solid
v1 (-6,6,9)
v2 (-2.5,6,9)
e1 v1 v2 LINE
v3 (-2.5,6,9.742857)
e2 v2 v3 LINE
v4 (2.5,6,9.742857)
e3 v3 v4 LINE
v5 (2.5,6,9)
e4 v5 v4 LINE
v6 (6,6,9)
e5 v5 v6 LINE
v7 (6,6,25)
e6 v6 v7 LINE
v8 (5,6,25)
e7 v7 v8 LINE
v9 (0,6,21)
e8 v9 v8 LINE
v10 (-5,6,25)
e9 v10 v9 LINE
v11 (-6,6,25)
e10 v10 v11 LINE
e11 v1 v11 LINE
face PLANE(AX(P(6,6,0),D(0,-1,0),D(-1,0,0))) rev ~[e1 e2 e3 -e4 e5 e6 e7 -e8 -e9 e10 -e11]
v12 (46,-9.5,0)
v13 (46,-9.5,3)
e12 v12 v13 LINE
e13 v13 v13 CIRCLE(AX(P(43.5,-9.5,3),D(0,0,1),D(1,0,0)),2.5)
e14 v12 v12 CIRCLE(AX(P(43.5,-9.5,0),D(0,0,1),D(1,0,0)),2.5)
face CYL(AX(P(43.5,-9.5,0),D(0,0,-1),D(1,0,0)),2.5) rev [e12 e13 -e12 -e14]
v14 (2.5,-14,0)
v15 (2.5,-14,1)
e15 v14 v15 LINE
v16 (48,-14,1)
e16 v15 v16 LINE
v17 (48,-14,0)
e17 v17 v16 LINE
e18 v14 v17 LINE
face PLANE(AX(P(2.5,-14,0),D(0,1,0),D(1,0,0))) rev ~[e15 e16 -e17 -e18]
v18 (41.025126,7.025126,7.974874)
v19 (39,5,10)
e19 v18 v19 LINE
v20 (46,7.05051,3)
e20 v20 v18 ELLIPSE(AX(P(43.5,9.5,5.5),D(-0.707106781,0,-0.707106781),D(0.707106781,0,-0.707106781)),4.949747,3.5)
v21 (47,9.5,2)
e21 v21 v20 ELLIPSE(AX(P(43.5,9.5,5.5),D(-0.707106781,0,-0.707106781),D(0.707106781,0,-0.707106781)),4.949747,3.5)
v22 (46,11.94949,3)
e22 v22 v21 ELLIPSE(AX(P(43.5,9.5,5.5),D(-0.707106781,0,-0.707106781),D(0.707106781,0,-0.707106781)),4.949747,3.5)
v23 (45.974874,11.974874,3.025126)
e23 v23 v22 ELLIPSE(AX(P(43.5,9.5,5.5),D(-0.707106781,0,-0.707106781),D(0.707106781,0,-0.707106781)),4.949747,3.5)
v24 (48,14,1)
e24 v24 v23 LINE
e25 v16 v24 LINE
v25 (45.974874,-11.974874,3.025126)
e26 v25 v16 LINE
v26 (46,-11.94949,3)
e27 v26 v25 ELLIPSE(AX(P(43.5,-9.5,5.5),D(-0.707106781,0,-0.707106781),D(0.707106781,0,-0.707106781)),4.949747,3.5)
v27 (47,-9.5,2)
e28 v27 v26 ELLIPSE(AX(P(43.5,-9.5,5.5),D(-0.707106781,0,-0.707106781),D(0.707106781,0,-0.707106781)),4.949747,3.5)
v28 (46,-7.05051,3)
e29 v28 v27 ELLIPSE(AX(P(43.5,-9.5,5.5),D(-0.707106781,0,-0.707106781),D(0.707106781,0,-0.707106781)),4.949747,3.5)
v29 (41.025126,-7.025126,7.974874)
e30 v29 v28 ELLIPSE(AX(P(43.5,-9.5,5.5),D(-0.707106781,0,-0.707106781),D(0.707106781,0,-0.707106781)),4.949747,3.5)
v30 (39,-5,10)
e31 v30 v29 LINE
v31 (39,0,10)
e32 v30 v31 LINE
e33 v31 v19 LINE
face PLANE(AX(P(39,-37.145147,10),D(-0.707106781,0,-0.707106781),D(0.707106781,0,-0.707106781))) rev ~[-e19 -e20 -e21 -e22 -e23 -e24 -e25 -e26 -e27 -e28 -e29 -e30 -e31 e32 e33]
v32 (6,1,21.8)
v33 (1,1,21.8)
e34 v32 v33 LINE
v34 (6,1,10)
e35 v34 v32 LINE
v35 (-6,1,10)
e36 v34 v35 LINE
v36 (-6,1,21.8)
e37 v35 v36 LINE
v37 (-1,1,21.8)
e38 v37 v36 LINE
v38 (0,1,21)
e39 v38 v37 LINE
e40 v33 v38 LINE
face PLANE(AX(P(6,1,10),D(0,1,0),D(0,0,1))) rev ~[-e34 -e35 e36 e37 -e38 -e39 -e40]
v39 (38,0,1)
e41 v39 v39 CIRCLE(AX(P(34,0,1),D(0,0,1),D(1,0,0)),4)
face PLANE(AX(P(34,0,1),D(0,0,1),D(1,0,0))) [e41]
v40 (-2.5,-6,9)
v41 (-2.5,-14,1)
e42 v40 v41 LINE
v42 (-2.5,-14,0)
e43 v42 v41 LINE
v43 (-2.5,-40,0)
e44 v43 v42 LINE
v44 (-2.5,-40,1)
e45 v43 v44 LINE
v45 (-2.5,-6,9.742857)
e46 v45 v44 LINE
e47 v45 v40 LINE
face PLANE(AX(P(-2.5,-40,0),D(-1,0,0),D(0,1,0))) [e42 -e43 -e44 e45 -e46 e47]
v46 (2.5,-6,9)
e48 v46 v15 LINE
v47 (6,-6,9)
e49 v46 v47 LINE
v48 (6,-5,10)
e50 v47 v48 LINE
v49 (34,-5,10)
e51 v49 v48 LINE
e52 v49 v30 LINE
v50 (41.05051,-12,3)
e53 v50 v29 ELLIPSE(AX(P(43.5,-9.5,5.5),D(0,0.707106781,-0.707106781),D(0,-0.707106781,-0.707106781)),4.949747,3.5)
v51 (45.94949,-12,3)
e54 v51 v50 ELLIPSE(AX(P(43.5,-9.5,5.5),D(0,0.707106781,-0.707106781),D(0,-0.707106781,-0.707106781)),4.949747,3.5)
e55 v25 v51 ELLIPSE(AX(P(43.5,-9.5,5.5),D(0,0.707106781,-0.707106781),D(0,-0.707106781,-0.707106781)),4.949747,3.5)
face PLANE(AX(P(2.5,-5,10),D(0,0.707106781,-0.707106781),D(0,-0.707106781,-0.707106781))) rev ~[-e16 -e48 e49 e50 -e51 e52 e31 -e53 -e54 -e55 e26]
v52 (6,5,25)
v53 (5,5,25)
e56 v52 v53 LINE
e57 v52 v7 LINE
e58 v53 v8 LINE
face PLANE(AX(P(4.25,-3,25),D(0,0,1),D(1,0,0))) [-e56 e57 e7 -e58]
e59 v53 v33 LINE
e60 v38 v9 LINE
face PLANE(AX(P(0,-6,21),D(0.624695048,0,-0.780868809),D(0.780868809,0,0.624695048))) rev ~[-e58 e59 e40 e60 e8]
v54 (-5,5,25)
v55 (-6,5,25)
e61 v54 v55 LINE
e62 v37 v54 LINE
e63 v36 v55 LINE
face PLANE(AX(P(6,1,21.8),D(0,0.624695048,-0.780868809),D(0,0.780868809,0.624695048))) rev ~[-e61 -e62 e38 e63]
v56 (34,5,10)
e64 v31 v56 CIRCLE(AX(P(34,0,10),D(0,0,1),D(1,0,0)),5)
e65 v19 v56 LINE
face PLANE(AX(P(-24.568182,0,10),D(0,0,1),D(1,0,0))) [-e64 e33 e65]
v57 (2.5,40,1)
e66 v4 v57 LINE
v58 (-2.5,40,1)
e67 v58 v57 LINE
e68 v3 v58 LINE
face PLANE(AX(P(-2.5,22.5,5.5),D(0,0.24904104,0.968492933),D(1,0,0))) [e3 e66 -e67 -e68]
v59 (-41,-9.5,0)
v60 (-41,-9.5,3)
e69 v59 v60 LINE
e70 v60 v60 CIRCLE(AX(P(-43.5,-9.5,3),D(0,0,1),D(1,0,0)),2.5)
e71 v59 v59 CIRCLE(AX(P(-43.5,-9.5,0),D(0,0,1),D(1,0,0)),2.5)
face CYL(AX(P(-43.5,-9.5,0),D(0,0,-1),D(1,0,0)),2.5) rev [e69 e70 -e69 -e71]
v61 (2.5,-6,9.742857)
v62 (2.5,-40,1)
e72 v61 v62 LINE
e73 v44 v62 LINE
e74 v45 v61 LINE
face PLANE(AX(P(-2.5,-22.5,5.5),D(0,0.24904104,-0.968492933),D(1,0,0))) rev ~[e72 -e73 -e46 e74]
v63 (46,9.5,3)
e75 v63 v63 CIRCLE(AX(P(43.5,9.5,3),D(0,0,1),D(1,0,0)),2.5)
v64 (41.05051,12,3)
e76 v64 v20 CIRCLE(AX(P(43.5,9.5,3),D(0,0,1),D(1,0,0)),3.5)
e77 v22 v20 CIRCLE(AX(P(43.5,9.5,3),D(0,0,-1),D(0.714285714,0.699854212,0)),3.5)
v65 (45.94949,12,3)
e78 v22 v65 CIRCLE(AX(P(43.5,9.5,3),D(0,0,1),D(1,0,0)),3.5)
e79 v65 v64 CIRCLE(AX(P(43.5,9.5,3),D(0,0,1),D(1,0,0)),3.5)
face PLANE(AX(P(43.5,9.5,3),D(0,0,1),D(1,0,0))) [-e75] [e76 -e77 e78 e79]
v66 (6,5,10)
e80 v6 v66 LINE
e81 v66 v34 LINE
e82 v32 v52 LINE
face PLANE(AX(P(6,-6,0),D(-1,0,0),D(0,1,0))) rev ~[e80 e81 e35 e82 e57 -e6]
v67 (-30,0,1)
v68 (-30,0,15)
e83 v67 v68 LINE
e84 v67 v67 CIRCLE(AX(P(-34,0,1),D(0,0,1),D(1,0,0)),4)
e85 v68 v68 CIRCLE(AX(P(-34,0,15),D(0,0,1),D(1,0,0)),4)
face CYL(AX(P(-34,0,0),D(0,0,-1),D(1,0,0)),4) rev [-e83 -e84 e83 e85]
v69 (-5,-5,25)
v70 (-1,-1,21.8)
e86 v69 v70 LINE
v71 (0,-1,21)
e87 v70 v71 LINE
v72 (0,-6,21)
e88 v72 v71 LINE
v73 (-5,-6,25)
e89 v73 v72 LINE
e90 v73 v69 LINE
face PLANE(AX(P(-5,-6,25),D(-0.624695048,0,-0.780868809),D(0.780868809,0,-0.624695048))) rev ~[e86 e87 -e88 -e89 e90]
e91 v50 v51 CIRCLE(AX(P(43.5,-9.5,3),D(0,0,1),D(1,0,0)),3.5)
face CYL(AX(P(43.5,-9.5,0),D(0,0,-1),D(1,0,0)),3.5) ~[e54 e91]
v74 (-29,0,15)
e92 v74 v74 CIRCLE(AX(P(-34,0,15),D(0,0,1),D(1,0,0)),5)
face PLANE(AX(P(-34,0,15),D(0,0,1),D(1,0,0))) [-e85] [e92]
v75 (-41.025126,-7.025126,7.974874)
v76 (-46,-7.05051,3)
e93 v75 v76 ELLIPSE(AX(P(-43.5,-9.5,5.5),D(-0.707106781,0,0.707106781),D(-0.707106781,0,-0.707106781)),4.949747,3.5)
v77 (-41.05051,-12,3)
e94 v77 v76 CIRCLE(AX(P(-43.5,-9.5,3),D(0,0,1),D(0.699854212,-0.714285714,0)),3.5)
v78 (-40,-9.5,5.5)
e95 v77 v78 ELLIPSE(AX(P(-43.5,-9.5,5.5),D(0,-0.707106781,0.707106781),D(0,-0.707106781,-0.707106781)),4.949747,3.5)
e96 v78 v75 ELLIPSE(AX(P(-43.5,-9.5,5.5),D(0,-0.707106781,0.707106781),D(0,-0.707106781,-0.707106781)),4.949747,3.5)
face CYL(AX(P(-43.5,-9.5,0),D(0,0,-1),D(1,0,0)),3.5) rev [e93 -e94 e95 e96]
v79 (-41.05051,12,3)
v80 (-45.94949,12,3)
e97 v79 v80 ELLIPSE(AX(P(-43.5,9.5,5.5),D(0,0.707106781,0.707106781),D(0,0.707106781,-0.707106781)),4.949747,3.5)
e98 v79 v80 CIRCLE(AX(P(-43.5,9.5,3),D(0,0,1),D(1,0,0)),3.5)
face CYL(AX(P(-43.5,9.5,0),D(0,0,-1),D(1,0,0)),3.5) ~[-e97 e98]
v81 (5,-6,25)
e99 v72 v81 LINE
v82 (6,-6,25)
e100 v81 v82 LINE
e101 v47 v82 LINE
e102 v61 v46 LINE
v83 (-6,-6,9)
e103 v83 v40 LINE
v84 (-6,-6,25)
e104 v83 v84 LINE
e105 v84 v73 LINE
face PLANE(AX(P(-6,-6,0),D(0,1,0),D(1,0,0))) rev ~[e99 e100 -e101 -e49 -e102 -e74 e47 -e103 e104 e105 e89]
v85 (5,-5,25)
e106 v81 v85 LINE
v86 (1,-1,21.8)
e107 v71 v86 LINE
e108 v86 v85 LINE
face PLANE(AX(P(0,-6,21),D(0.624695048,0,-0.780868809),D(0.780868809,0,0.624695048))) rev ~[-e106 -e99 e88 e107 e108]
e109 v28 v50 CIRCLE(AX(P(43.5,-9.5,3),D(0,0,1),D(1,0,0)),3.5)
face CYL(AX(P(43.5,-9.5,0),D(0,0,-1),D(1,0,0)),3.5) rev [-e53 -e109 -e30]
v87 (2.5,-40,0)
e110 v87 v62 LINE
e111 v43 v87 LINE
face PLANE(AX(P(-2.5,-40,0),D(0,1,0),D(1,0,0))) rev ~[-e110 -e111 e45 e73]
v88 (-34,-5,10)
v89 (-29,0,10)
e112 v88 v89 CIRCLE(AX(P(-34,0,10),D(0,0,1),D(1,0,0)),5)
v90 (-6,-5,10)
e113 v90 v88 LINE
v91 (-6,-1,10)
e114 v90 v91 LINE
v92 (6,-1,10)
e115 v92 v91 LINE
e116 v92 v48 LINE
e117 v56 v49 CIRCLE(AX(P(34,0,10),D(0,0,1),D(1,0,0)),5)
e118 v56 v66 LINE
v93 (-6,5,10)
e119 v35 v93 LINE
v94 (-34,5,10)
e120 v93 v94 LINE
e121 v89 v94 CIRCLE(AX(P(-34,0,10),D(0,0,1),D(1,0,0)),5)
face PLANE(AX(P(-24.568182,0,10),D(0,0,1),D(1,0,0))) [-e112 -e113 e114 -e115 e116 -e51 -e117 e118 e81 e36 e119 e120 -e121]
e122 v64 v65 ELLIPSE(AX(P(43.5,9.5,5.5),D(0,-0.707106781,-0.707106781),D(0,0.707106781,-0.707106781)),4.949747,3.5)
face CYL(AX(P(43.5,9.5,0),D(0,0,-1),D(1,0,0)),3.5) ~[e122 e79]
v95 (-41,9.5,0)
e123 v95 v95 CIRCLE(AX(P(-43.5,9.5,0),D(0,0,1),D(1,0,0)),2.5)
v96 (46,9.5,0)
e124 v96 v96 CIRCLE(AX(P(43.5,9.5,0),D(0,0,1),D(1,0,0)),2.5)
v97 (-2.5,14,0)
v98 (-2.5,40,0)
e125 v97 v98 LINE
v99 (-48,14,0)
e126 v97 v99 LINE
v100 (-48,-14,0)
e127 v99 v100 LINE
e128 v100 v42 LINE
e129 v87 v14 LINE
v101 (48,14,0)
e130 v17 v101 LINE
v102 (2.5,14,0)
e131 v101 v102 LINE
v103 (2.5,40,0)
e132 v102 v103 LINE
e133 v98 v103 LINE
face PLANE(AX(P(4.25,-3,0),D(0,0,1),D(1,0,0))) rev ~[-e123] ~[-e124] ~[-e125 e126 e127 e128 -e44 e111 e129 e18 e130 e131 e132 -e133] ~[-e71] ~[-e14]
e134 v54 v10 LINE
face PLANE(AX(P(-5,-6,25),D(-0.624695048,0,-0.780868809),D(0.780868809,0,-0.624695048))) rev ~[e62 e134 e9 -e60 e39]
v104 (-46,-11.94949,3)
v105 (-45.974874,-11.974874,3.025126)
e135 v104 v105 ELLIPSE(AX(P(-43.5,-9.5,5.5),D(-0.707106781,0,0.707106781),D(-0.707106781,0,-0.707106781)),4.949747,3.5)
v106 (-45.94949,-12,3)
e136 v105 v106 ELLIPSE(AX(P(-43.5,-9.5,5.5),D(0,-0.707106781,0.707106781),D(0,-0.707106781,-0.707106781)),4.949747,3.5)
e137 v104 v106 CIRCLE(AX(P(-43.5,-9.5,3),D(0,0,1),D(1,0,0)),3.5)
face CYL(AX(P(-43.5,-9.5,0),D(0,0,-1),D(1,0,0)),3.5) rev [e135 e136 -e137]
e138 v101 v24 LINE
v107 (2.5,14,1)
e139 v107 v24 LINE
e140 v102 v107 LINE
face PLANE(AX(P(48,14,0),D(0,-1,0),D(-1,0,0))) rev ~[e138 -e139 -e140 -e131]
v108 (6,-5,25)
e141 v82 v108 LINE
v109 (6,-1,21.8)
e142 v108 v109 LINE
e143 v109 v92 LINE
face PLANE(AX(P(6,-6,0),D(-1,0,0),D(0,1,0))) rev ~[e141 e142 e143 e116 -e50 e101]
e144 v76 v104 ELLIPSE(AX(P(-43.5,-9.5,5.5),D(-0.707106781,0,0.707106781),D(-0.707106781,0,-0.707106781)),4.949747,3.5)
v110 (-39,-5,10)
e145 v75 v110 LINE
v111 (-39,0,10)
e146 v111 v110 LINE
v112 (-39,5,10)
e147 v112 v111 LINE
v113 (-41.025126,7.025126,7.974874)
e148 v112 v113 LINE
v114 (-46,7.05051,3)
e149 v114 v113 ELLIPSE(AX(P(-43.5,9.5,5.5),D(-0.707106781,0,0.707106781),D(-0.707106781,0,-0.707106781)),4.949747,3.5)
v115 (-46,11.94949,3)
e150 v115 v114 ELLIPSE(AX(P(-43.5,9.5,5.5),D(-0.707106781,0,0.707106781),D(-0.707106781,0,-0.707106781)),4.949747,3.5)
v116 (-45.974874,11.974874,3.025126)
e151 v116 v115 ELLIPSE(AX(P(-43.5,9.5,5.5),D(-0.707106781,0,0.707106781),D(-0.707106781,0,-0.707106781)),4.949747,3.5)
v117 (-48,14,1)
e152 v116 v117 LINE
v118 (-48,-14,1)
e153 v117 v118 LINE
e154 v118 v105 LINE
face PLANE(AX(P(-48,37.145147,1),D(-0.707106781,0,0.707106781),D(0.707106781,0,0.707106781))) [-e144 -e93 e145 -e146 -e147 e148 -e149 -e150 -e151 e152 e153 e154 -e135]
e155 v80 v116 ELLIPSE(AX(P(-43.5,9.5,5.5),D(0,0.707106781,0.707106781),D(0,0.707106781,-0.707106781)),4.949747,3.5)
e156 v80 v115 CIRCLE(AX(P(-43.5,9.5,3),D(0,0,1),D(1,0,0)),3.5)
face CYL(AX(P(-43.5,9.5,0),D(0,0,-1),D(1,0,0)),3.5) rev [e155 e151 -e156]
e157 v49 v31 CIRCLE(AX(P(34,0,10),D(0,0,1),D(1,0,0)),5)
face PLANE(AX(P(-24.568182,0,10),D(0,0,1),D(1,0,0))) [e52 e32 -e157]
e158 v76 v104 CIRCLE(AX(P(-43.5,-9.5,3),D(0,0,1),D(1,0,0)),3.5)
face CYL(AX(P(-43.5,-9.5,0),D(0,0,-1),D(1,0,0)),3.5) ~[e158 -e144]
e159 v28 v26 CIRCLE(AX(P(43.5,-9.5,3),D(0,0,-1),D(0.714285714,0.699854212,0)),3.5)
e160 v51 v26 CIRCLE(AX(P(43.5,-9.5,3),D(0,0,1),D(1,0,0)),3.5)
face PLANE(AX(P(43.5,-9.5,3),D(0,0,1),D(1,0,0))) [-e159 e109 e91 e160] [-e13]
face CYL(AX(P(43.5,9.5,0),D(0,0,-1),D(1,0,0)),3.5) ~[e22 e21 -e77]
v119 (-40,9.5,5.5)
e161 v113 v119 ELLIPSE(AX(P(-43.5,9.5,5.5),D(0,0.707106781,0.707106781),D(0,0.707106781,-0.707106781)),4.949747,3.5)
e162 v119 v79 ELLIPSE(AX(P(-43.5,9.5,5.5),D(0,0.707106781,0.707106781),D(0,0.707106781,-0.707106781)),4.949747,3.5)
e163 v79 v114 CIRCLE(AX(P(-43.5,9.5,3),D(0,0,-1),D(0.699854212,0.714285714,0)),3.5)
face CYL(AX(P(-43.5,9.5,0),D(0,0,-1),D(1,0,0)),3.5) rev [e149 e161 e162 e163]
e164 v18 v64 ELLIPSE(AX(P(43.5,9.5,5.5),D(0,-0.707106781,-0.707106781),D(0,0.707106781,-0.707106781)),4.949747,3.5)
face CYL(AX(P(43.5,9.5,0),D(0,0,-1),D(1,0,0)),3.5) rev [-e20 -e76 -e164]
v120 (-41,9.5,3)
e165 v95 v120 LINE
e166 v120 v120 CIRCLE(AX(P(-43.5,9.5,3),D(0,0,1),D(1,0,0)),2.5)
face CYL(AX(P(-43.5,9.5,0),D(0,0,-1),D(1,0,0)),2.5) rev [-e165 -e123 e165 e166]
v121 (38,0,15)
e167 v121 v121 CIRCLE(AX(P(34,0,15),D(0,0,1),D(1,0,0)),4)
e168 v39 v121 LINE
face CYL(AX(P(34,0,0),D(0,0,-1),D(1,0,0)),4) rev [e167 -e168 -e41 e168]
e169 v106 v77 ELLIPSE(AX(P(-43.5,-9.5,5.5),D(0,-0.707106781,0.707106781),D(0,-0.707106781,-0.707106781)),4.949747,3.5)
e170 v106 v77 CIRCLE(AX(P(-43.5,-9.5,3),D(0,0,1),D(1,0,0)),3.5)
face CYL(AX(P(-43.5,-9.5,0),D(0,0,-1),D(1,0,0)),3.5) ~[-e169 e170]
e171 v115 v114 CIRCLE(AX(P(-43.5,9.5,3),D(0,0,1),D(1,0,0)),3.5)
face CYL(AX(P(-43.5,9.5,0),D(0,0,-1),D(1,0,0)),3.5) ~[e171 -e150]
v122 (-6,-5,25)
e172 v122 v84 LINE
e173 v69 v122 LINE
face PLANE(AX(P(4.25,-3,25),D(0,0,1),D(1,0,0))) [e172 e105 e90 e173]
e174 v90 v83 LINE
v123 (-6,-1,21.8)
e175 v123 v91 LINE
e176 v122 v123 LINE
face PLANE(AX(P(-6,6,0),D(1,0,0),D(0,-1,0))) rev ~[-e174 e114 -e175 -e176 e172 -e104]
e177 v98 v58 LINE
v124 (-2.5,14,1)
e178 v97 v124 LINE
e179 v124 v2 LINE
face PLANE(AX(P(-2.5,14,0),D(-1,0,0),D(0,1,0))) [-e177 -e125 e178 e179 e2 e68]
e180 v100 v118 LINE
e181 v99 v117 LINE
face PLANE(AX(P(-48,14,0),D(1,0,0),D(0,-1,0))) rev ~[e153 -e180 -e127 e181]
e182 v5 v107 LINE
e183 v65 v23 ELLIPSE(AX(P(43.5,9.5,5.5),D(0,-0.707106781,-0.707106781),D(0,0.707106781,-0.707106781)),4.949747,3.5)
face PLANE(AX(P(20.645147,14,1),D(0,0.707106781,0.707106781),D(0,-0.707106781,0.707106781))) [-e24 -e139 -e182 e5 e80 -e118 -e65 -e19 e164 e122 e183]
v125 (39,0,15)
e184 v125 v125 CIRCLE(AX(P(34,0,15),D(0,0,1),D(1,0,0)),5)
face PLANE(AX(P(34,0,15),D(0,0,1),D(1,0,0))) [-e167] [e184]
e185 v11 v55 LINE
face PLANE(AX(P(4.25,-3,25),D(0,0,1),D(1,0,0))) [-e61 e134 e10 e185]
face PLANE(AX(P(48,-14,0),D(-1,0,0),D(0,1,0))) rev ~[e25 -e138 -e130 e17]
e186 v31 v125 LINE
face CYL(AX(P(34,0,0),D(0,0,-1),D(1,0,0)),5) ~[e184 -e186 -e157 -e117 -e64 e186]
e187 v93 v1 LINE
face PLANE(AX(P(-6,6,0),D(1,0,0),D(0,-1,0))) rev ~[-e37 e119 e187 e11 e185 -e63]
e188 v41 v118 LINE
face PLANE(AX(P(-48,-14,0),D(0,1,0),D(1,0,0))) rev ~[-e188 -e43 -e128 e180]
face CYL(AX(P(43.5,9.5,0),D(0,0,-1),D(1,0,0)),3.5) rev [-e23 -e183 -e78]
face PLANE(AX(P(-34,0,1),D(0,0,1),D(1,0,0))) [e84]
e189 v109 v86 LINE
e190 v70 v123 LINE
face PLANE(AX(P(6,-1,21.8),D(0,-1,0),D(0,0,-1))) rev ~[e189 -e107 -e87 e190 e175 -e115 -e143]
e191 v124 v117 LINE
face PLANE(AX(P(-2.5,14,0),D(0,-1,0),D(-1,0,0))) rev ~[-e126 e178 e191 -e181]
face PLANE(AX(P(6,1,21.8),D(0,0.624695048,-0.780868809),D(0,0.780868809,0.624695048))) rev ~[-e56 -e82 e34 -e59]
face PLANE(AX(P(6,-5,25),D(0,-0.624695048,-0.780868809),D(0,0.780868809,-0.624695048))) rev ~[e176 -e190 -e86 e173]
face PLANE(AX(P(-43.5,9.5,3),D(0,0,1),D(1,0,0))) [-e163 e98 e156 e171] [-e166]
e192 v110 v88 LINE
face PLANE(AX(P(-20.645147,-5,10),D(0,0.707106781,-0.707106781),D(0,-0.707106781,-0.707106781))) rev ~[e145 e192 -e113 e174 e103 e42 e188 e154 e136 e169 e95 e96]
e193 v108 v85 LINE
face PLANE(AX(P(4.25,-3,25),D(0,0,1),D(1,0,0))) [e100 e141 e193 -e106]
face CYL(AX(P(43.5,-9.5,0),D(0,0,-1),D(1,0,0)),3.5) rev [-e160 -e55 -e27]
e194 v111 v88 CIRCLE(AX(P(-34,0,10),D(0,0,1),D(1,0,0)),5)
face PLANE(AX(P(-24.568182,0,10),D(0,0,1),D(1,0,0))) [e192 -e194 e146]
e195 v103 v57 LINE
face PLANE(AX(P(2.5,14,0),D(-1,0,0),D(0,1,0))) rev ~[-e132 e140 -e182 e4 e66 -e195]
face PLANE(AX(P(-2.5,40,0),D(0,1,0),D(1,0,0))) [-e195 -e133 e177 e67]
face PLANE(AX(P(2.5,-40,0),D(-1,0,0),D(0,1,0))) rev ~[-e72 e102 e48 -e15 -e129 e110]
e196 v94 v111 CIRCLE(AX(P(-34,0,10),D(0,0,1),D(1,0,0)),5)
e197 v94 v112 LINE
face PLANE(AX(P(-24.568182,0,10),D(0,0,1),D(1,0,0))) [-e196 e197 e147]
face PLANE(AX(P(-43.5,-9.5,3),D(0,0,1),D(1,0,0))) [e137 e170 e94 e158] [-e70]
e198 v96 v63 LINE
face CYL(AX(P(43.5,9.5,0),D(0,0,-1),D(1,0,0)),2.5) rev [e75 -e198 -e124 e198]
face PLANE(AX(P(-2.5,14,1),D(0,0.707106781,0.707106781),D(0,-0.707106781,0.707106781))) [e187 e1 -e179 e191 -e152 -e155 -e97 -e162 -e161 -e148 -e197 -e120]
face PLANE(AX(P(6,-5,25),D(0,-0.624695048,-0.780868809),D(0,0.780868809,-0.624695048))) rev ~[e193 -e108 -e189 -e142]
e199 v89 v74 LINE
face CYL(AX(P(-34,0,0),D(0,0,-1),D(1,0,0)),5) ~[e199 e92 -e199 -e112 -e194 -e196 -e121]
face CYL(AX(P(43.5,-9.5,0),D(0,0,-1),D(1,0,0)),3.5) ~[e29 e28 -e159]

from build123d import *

# Parameters (mm, degrees)
F0_R         = 3.5
F0_R_2       = 5
F0_W         = 5
F0_H         = 26
F0_W_2       = 2.5
F0_H_2       = 6
F0_W_3       = 3.5
F1_DEPTH     = 10
F0_R_3       = 4
F2_DEPTH     = 15
F3_DEPTH     = 1
F4_T4_DEPTH  = 74.2902937834
F4_S5_R      = 5
F4_T6_DEPTH  = 39
F4_T10_DEPTH = 74.2902937834
F4_S11_R     = 5
F4_T12_DEPTH = 39
F4_T16_DEPTH = 91.7902937834
F4_T21_DEPTH = 68.6451468917
F4_S22_R     = 5
F4_T23_DEPTH = 36
F4_T27_DEPTH = 68.6451468917
F4_S28_R     = 5
F4_T29_DEPTH = 36
F4_T33_DEPTH = 91.7902937834
F4_T38_DEPTH = 91.7902937834
F4_T43_DEPTH = 68.6451468917
F4_S44_R     = 5
F4_T45_DEPTH = 36
F4_T49_DEPTH = 68.6451468917
F4_S50_R     = 5
F4_T51_DEPTH = 36
F4_T55_DEPTH = 91.7902937834
F5_SIZE2     = 9
F5_SIZE      = 35
F0_R_4       = 2.5
F6_DEPTH     = 3
F7_DEPTH     = 25
F8_W         = 2
F8_H         = 7
F10_DEPTH    = 25
F11_DEPTH    = 25


# Not quite as in the source:
# - a fillet or chamfer that OpenCascade refuses, or shapes differently, is made with other operations: its cross-section is extruded or revolved along the edge and cut away or added


with BuildPart() as f1:
    # F0 (on Top) → F1 (new body)
    with BuildSketch(Plane.XY):
        Polygon((-2.5, 14), (-48, 14), (-48, -14), (-2.5, -14), (-2.5, -6), (-6, -6), (-6, 0), (-6, 6), (-2.5, 6), align=None)
        with Locations((-43.5, -9.5)):
            Circle(F0_R, mode=Mode.SUBTRACT)
        with Locations((-43.5, 9.5)):
            Circle(F0_R, mode=Mode.SUBTRACT)
        with Locations((-34, 0)):
            Circle(F0_R_2, mode=Mode.SUBTRACT)
        Polygon((48, 14), (2.5, 14), (2.5, 6), (6, 6), (6, 0), (6, -6), (2.5, -6), (2.5, -14), (48, -14), align=None)
        with Locations((43.5, -9.5)):
            Circle(F0_R, mode=Mode.SUBTRACT)
        with Locations((34, 0)):
            Circle(F0_R_2, mode=Mode.SUBTRACT)
        with Locations((43.5, 9.5)):
            Circle(F0_R, mode=Mode.SUBTRACT)
        Polygon((-2.5, -6), (-2.5, -14), (2.5, -14), (2.5, -6), (0, -6), align=None)
        with Locations((0, -27)):
            Rectangle(F0_W, F0_H)
        Polygon((2.5, 14), (-2.5, 14), (-2.5, 6), (0, 6), (2.5, 6), align=None)
        with Locations((0, 27)):
            Rectangle(F0_W, F0_H)
        with Locations((1.25, -3)):
            Rectangle(F0_W_2, F0_H_2)
        with Locations((4.25, -3)):
            Rectangle(F0_W_3, F0_H_2)
        with Locations((-4.25, -3)):
            Rectangle(F0_W_3, F0_H_2)
        with Locations((-1.25, -3)):
            Rectangle(F0_W_2, F0_H_2)
        with Locations((-1.25, 3)):
            Rectangle(F0_W_2, F0_H_2)
        with Locations((-4.25, 3)):
            Rectangle(F0_W_3, F0_H_2)
        with Locations((4.25, 3)):
            Rectangle(F0_W_3, F0_H_2)
        with Locations((1.25, 3)):
            Rectangle(F0_W_2, F0_H_2)
    extrude(amount=F1_DEPTH)

    # F0 (on Top) → F2 (join)
    with BuildSketch(Plane.XY):
        with Locations((-34, 0)):
            Circle(F0_R_2)
        with Locations((-34, 0)):
            Circle(F0_R_3, mode=Mode.SUBTRACT)
        with Locations((34, 0)):
            Circle(F0_R_2)
        with Locations((34, 0)):
            Circle(F0_R_3, mode=Mode.SUBTRACT)
    extrude(amount=F2_DEPTH)

    # F0 (on Top) → F3 (join)
    with BuildSketch(Plane.XY):
        with Locations((-34, 0)):
            Circle(F0_R_3)
        with Locations((34, 0)):
            Circle(F0_R_3)
    extrude(amount=F3_DEPTH)

    # F4: chamfer of 9 on 6 edges, made by hand


with BuildPart() as f4_tool2:
    # F4_s3 → F4_t4 (new body)
    with BuildSketch(Plane.XZ.offset(37.1451468917)):
        Polygon((39, 10), (48, 1), (48, 10), align=None)
    extrude(amount=-F4_T4_DEPTH)

    # F4_s5 → F4_t6 (cut, symmetric)
    with BuildSketch(Plane.XY.offset(5.5)):
        with Locations((34, 0)):
            Circle(F4_S5_R)
    extrude(amount=F4_T6_DEPTH, both=True, mode=Mode.SUBTRACT)


with BuildPart() as f1_1:
    add(f1.part)

    # F4_t1: cut F4_tool2
    add(f4_tool2.part, mode=Mode.SUBTRACT)


with BuildPart() as f4_tool8:
    # F4_s9 → F4_t10 (new body)
    with BuildSketch(Plane.XZ.offset(-37.1451468917)):
        Polygon((-48, 1), (-39, 10), (-48, 10), align=None)
    extrude(amount=F4_T10_DEPTH)

    # F4_s11 → F4_t12 (cut, symmetric)
    with BuildSketch(Plane.XY.offset(5.5)):
        with Locations((-34, 0)):
            Circle(F4_S11_R)
    extrude(amount=F4_T12_DEPTH, both=True, mode=Mode.SUBTRACT)


with BuildPart() as f1_2:
    add(f1_1.part)

    # F4_t7: cut F4_tool8
    add(f4_tool8.part, mode=Mode.SUBTRACT)


with BuildPart() as f4_tool14:
    # F4_s15 → F4_t16 (new body)
    with BuildSketch(Plane.YZ.offset(20.6451468917)):
        Polygon((14, 1), (5, 10), (14, 10), align=None)
    extrude(amount=-F4_T16_DEPTH)

    split(bisect_by=Plane.YZ.offset(2.5), keep=Keep.TOP)


with BuildPart() as f1_3:
    add(f1_2.part)

    # F4_t13: cut F4_tool14
    add(f4_tool14.part, mode=Mode.SUBTRACT)


with BuildPart() as f4_tool19:
    # F4_s20 → F4_t21 (new body)
    with BuildSketch(Plane.YZ.offset(-2.5)):
        Polygon((14, 1), (5, 10), (14, 10), align=None)
    extrude(amount=-F4_T21_DEPTH)

    # F4_s22 → F4_t23 (cut, symmetric)
    with BuildSketch(Plane.XY.offset(5.5)):
        with Locations((-34, 0)):
            Circle(F4_S22_R)
    extrude(amount=F4_T23_DEPTH, both=True, mode=Mode.SUBTRACT)


with BuildPart() as f1_4:
    add(f1_3.part)

    # F4_t18: cut F4_tool19
    add(f4_tool19.part, mode=Mode.SUBTRACT)


with BuildPart() as f4_tool25:
    # F4_s26 → F4_t27 (new body)
    with BuildSketch(Plane.YZ.offset(71.1451468917)):
        Polygon((5, 10), (14, 1), (14, 10), align=None)
    extrude(amount=-F4_T27_DEPTH)

    # F4_s28 → F4_t29 (cut, symmetric)
    with BuildSketch(Plane.XY.offset(5.5)):
        with Locations((34, 0)):
            Circle(F4_S28_R)
    extrude(amount=F4_T29_DEPTH, both=True, mode=Mode.SUBTRACT)


with BuildPart() as f1_5:
    add(f1_4.part)

    # F4_t24: cut F4_tool25
    add(f4_tool25.part, mode=Mode.SUBTRACT)


with BuildPart() as f4_tool31:
    # F4_s32 → F4_t33 (new body)
    with BuildSketch(Plane.YZ.offset(71.1451468917)):
        Polygon((5, 10), (14, 1), (14, 10), align=None)
    extrude(amount=-F4_T33_DEPTH)

    split(bisect_by=Plane.YZ.offset(-2.5), keep=Keep.BOTTOM)


with BuildPart() as f1_6:
    add(f1_5.part)

    # F4_t30: cut F4_tool31
    add(f4_tool31.part, mode=Mode.SUBTRACT)


with BuildPart() as f4_tool36:
    # F4_s37 → F4_t38 (new body)
    with BuildSketch(Plane.YZ.offset(-20.6451468917)):
        Polygon((-5, 10), (-14, 1), (-14, 10), align=None)
    extrude(amount=F4_T38_DEPTH)

    split(bisect_by=Plane.YZ.offset(-2.5), keep=Keep.BOTTOM)


with BuildPart() as f1_7:
    add(f1_6.part)

    # F4_t35: cut F4_tool36
    add(f4_tool36.part, mode=Mode.SUBTRACT)


with BuildPart() as f4_tool41:
    # F4_s42 → F4_t43 (new body)
    with BuildSketch(Plane.YZ.offset(2.5)):
        Polygon((-5, 10), (-14, 1), (-14, 10), align=None)
    extrude(amount=F4_T43_DEPTH)

    # F4_s44 → F4_t45 (cut, symmetric)
    with BuildSketch(Plane.XY.offset(5.5)):
        with Locations((34, 0)):
            Circle(F4_S44_R)
    extrude(amount=F4_T45_DEPTH, both=True, mode=Mode.SUBTRACT)


with BuildPart() as f1_8:
    add(f1_7.part)

    # F4_t40: cut F4_tool41
    add(f4_tool41.part, mode=Mode.SUBTRACT)


with BuildPart() as f4_tool47:
    # F4_s48 → F4_t49 (new body)
    with BuildSketch(Plane.YZ.offset(-71.1451468917)):
        Polygon((-14, 1), (-5, 10), (-14, 10), align=None)
    extrude(amount=F4_T49_DEPTH)

    # F4_s50 → F4_t51 (cut, symmetric)
    with BuildSketch(Plane.XY.offset(5.5)):
        with Locations((-34, 0)):
            Circle(F4_S50_R)
    extrude(amount=F4_T51_DEPTH, both=True, mode=Mode.SUBTRACT)


with BuildPart() as f1_9:
    add(f1_8.part)

    # F4_t46: cut F4_tool47
    add(f4_tool47.part, mode=Mode.SUBTRACT)


with BuildPart() as f4_tool53:
    # F4_s54 → F4_t55 (new body)
    with BuildSketch(Plane.YZ.offset(-71.1451468917)):
        Polygon((-14, 1), (-5, 10), (-14, 10), align=None)
    extrude(amount=F4_T55_DEPTH)

    split(bisect_by=Plane.YZ.offset(2.5), keep=Keep.TOP)


with BuildPart() as f1_10:
    add(f1_9.part)

    # F4_t52: cut F4_tool53
    add(f4_tool53.part, mode=Mode.SUBTRACT)

    # F5
    f5_edges = [f1_10.edges().sort_by_distance(p)[0] for p in [
        (0, 40, 10),
        (0, -40, 10),
    ]]
    f5_side = f1_10.faces().sort_by_distance((0, 0, 10))[0]
    chamfer(f5_edges, length=F5_SIZE, length2=F5_SIZE2, reference=f5_side)

    # F0 (on Top) → F6 (join)
    with BuildSketch(Plane.XY):
        with Locations((-43.5, -9.5)):
            Circle(F0_R)
        with Locations((-43.5, -9.5)):
            Circle(F0_R_4, mode=Mode.SUBTRACT)
        with Locations((-43.5, 9.5)):
            Circle(F0_R)
        with Locations((-43.5, 9.5)):
            Circle(F0_R_4, mode=Mode.SUBTRACT)
        with Locations((43.5, 9.5)):
            Circle(F0_R)
        with Locations((43.5, 9.5)):
            Circle(F0_R_4, mode=Mode.SUBTRACT)
        with Locations((43.5, -9.5)):
            Circle(F0_R)
        with Locations((43.5, -9.5)):
            Circle(F0_R_4, mode=Mode.SUBTRACT)
    extrude(amount=F6_DEPTH)

    # F0 (on Top) → F7 (join)
    with BuildSketch(Plane.XY):
        with Locations((4.25, -3)):
            Rectangle(F0_W_3, F0_H_2)
        with Locations((1.25, -3)):
            Rectangle(F0_W_2, F0_H_2)
        with Locations((-1.25, -3)):
            Rectangle(F0_W_2, F0_H_2)
        with Locations((-4.25, -3)):
            Rectangle(F0_W_3, F0_H_2)
        with Locations((-4.25, 3)):
            Rectangle(F0_W_3, F0_H_2)
        with Locations((-1.25, 3)):
            Rectangle(F0_W_2, F0_H_2)
        with Locations((4.25, 3)):
            Rectangle(F0_W_3, F0_H_2)
        with Locations((1.25, 3)):
            Rectangle(F0_W_2, F0_H_2)
    extrude(amount=F7_DEPTH)

    # F8 (on face) → F10 (cut)
    with BuildSketch(Plane.YZ.offset(6)):
        Polygon((-1, 25), (-5, 25), (-1, 21.8), align=None)
        Polygon((-1, 25), (-1, 21.8), (0, 21), (1, 21.8), (1, 25), align=None)
        Polygon((5, 25), (1, 25), (1, 21.8), align=None)
        Polygon((0, 21), (-1, 21.8), (-1, 17), (1, 17), (1, 21.8), align=None)
        with Locations((0, 13.5)):
            Rectangle(F8_W, F8_H)
    extrude(amount=-F10_DEPTH, mode=Mode.SUBTRACT)

    # F9 (on face) → F11 (cut)
    with BuildSketch(Plane.XZ.offset(6)):
        Polygon((-1, 25), (-1, 21.8), (0, 21), (1, 21.8), (1, 25), align=None)
        Polygon((-1, 25), (-5, 25), (-1, 21.8), align=None)
        Polygon((5, 25), (1, 25), (1, 21.8), align=None)
    extrude(amount=-F11_DEPTH, mode=Mode.SUBTRACT)


solid = f1_10.part
